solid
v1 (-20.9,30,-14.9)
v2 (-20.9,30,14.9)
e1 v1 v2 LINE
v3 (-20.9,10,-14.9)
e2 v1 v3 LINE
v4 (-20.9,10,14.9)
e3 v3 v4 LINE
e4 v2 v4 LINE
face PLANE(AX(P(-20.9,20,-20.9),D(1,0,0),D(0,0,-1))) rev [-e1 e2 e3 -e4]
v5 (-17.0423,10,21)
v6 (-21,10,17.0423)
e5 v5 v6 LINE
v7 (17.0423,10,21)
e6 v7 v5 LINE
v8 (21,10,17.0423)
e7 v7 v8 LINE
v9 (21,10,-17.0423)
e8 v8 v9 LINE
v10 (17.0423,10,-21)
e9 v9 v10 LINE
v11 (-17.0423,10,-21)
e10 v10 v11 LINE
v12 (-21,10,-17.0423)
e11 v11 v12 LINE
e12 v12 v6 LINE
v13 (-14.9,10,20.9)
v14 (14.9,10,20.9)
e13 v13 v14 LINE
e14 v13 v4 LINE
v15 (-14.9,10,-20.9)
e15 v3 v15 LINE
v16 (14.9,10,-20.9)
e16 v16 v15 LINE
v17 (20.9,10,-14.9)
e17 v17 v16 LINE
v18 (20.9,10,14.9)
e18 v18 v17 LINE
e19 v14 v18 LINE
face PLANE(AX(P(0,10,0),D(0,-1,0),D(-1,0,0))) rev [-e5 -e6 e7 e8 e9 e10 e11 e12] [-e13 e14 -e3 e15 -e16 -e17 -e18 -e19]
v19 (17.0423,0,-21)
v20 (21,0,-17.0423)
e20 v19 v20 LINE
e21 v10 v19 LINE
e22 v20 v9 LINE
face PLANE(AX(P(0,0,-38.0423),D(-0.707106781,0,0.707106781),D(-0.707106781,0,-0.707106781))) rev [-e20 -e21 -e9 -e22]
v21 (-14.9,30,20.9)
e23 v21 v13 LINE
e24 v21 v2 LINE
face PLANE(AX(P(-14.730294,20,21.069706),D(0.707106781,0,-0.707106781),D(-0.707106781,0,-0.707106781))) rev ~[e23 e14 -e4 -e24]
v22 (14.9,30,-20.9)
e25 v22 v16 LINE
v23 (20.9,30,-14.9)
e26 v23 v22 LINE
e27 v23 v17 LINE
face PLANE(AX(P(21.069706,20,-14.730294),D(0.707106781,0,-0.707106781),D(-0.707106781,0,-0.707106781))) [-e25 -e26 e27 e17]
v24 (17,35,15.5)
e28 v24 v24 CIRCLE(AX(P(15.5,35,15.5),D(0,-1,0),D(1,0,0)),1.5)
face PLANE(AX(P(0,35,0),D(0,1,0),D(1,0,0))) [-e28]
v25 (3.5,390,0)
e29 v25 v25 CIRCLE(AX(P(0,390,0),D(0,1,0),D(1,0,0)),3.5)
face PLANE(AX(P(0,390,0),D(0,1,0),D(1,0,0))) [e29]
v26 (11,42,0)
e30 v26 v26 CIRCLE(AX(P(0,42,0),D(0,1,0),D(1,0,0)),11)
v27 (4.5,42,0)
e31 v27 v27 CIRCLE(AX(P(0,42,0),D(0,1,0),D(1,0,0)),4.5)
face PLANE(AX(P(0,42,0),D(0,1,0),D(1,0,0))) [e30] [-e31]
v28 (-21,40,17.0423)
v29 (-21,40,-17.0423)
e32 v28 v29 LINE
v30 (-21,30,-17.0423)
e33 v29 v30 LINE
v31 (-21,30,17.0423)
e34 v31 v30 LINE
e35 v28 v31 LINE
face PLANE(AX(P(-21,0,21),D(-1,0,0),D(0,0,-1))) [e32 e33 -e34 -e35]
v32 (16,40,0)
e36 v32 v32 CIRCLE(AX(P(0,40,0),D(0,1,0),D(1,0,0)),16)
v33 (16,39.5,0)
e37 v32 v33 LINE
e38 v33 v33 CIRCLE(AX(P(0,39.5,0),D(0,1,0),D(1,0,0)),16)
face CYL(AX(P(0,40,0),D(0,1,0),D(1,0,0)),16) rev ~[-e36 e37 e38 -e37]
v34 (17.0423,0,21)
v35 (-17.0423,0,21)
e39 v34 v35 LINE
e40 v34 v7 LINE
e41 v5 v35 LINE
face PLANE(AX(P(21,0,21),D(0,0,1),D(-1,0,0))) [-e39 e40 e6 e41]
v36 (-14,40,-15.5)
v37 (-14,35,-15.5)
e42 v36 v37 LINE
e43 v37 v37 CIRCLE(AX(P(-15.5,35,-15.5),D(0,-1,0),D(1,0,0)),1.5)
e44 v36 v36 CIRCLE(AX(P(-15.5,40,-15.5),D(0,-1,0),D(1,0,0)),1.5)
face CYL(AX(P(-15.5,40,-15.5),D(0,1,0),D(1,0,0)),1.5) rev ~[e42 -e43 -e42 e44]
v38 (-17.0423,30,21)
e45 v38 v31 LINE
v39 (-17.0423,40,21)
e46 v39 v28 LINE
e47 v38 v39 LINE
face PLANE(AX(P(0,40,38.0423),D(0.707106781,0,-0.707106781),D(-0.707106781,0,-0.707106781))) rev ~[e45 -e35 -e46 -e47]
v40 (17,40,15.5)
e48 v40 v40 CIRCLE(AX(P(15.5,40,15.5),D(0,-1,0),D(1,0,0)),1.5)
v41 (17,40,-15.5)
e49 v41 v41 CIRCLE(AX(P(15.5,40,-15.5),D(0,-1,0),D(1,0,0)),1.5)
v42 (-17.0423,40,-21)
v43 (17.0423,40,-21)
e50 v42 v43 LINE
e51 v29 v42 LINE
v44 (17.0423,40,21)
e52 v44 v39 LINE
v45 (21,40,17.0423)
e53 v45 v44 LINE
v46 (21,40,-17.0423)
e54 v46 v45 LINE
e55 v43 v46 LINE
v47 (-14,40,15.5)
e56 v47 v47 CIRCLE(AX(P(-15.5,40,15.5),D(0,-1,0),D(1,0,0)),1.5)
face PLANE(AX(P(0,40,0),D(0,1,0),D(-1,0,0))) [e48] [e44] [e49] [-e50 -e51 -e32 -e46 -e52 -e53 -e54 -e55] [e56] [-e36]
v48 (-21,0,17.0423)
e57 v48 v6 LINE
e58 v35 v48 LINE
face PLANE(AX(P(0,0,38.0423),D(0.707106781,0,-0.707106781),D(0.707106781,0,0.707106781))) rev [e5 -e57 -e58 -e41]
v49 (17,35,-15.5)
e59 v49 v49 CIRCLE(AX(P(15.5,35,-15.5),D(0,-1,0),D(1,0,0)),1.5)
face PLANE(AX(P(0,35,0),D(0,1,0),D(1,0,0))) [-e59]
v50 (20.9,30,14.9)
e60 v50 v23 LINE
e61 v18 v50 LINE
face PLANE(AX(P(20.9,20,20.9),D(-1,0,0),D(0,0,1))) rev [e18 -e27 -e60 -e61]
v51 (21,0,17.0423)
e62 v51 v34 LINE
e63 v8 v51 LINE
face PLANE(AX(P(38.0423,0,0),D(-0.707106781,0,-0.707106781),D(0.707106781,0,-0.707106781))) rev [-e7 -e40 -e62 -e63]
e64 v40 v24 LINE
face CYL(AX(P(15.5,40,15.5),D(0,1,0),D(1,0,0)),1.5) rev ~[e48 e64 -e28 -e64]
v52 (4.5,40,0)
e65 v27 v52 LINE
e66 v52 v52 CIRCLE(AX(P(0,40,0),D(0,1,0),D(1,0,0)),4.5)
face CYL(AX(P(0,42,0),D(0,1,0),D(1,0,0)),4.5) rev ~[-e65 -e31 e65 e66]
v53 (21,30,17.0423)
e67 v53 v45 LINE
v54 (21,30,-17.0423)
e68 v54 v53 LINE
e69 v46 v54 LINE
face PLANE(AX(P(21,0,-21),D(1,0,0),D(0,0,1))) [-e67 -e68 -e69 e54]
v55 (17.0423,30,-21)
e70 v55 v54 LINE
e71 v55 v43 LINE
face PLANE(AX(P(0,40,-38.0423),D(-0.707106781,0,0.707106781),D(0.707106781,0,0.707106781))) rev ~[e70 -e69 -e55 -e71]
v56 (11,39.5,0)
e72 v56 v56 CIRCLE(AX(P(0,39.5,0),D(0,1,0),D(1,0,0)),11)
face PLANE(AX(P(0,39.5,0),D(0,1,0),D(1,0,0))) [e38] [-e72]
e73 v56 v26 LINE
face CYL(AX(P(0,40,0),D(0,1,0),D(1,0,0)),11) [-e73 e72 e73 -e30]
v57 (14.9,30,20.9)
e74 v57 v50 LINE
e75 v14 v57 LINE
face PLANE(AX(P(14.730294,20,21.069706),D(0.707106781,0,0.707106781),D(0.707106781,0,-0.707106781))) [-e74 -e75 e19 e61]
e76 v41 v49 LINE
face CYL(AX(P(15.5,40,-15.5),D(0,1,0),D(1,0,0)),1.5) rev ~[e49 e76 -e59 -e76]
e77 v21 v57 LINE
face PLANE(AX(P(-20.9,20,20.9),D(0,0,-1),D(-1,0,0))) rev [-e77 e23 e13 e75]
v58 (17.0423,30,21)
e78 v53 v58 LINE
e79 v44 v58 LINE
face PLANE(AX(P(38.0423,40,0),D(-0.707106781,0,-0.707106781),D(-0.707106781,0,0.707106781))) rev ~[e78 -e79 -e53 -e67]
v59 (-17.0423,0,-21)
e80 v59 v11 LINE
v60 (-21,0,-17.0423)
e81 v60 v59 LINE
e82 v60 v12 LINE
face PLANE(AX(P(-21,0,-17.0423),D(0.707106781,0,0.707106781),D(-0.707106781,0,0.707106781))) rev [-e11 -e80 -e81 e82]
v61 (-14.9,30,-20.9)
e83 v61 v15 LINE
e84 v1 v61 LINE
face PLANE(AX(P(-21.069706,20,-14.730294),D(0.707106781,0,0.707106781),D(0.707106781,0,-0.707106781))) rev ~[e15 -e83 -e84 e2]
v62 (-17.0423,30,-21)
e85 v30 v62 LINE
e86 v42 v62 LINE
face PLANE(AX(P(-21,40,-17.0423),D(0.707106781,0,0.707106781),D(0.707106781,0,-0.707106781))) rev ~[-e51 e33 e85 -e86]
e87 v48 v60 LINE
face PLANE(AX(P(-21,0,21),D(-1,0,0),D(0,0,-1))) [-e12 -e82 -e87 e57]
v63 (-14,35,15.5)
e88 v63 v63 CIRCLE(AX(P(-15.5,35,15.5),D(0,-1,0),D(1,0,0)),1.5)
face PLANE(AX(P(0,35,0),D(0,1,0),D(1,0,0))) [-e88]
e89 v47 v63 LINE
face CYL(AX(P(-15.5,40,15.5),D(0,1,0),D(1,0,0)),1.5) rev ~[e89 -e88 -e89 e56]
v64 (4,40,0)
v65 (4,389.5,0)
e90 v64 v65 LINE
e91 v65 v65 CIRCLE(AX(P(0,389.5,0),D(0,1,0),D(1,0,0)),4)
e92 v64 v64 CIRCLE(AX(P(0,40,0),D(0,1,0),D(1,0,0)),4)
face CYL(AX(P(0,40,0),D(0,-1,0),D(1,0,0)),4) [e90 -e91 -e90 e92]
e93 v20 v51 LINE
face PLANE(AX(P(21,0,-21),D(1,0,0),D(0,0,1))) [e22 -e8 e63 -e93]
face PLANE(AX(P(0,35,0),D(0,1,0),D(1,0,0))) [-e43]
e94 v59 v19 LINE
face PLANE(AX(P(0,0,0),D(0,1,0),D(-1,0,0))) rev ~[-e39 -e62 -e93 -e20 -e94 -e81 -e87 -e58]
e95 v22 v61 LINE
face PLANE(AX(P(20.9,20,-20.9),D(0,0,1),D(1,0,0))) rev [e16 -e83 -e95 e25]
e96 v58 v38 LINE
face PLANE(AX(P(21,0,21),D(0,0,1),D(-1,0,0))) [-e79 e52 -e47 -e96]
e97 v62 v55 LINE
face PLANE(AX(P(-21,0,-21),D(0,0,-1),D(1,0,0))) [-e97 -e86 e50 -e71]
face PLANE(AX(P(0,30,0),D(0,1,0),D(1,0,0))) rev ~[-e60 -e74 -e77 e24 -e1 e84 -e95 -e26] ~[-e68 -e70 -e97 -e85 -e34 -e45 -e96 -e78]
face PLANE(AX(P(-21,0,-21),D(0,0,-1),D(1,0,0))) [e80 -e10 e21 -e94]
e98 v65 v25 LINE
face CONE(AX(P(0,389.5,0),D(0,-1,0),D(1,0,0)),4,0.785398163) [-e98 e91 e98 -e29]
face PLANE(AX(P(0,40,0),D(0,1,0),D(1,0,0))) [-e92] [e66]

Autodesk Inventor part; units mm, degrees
ref_plane "YZ Plane" through (0, 0, 0) normal (1, 0, 0) x (0, 1, 0)
ref_plane "XZ Plane" through (0, 0, 0) normal (0, 1, 0) x (-1, 0, 0)
sketch "Sketch1" plane through (0, 0, 0) normal (0, 1, 0) x (-1, 0, 0)
  line L0 (-21, 21) -> (21, 21)
  line L1 (21, 21) -> (21, -21)
  line L2 (21, -21) -> (-21, -21)
  line L3 (-21, -21) -> (-21, 21)
  line L4 (-21, 21) -> (21, -21) construction
  line L5 (21, 21) -> (-21, -21) construction
  point P0 (0, 0)
  dimension "d0" = 42
  dimension "d1" = 42
extrude "Extrusion1" add sketch "Sketch1" along normal blind 40
ref_plane "Work Plane1" through (0, 20, 0) normal (0, 1, 0) x (1, 0, 0)
sketch "Sketch2" plane through (0, 40, 0) normal (0, 1, 0) x (1, 0, 0)
  line L0 (0, -38.0423) -> (-38.0423, 0)
  line L1 (-38.0423, 0) -> (0, 38.0423)
  line L2 (0, 38.0423) -> (38.0423, 0)
  line L3 (38.0423, 0) -> (0, -38.0423)
  line L4 (0, -38.0423) -> (0, 38.0423) construction
  line L5 (-38.0423, 0) -> (38.0423, 0) construction
  line L6 (-21, 21) -> (-21, -21) projected
  circle A0 centre (0, 0) radius 250
  dimension "d4" = 53.8
  dimension "d5" = 53.8
  dimension "d6" = 500
extrude "Extrusion2" cut sketch "Sketch2" against normal blind 10
sketch "Sketch3" plane through (0, 20, 0) normal (0, 1, 0) x (1, 0, 0)
  line L0 (-20.9, -20.9) -> (20.9, -20.9)
  line L1 (20.9, -20.9) -> (20.9, 20.9)
  line L2 (20.9, 20.9) -> (-20.9, 20.9)
  line L3 (-20.9, 20.9) -> (-20.9, -20.9)
  line L4 (-21, -21) -> (-21, -17.0423) projected
  line L5 (21, -21) -> (17.0423, -21) projected
  line L6 (21, 21) -> (21, 17.0423) projected
  line L7 (-21, 21) -> (-17.0423, 21) projected
  circle A0 centre (0, 0) radius 200
  dimension "d9" = 0.1
  dimension "d10" = 0.1
  dimension "d11" = 0.1
  dimension "d12" = 0.1
  dimension "d13" = 400
extrude "Extrusion3" cut sketch "Sketch3" along normal up to surface (10 mm away)
chamfer "Chamfer1" distance 6 angle 45 4 edges at (20.9, 25, 20.9) (20.9, 25, -20.9) (-20.9, 25, 20.9) (-20.9, 25, -20.9)
mirror "Mirror1" about plane through (0, 20, 0) normal (0, 1, 0) of "Extrusion3", "Extrusion2", "Chamfer1"
sketch "Sketch4" plane through (0, 40, 0) normal (0, 1, 0) x (1, 0, 0)
  circle A0 centre (0, 0) radius 11
  dimension "d19" = 22
extrude "Extrusion4" add sketch "Sketch4" along normal blind 2
sketch "Sketch5" plane through (0, 40, 0) normal (0, 1, 0) x (1, 0, 0)
  circle A0 centre (0, 0) radius 11 projected
  line L0 (17.0423, -21) -> (21, -17.0423) projected
  line L1 (21, -17.0423) -> (21, 17.0423) projected
  line L2 (21, 17.0423) -> (17.0423, 21) projected
  line L3 (17.0423, 21) -> (-17.0423, 21) projected
  line L4 (-17.0423, 21) -> (-21, 17.0423) projected
  line L5 (-21, 17.0423) -> (-21, -17.0423) projected
  line L6 (-21, -17.0423) -> (-17.0423, -21) projected
  line L7 (-17.0423, -21) -> (17.0423, -21) projected
  circle A1 centre (0, 0) radius 16
  dimension "d22" = 32
extrude "Extrusion5" cut sketch "Sketch5" against normal blind 0.5 contours A1
sketch "Sketch6" plane through (0, 42, 0) normal (0, 1, 0) x (1, 0, 0)
  circle A0 centre (0, 0) radius 4.5
  dimension "d25" = 9
extrude "Extrusion6" cut sketch "Sketch6" against normal blind 2
sketch "Sketch7" plane through (0, 40, 0) normal (0, 1, 0) x (1, 0, 0)
  circle A0 centre (0, 0) radius 4
  dimension "d28" = 8
extrude "Extrusion7" add sketch "Sketch7" along normal blind 350
thread "Thread1" size "TR8x1.5" class "7e" standard "ISO Metric Trapezoidal Threads" full length
chamfer "Chamfer2" distance 0.5 angle 45 1 edges at (-4, 390, 0)
sketch "Sketch8" plane through (0, 40, 0) normal (0, 1, 0) x (1, 0, 0)
  circle A0 centre (0, 0) radius 16 construction
  line L0 (17.0423, -21) -> (21, -17.0423) construction
  line L1 (21, -17.0423) -> (21, 17.0423) construction
  line L2 (21, 17.0423) -> (17.0423, 21) construction
  line L3 (17.0423, 21) -> (-17.0423, 21) construction
  line L4 (-17.0423, 21) -> (-21, 17.0423) construction
  line L5 (-21, 17.0423) -> (-21, -17.0423) construction
  line L6 (-21, -17.0423) -> (-17.0423, -21) construction
  line L7 (-17.0423, -21) -> (17.0423, -21) construction
  line L8 (-15.5, -15.5) -> (15.5, -15.5) construction
  line L9 (15.5, -15.5) -> (15.5, 15.5) construction
  line L10 (15.5, 15.5) -> (-15.5, 15.5) construction
  line L11 (-15.5, 15.5) -> (-15.5, -15.5) construction
  line L12 (-15.5, -15.5) -> (15.5, 15.5) construction
  line L13 (15.5, -15.5) -> (-15.5, 15.5) construction
  circle A1 centre (-15.5, 15.5) radius 1.5
  circle A2 centre (15.5, 15.5) radius 1.5
  circle A3 centre (15.5, -15.5) radius 1.5
  circle A4 centre (-15.5, -15.5) radius 1.5
  dimension "d36" = 31
  dimension "d37" = 31
  dimension "d38" = 3
  dimension "d39" = 3
  dimension "d40" = 3
  dimension "d41" = 3
extrude "Extrusion8" cut sketch "Sketch8" against normal blind 5
thread "Thread2" size "M3x0.5" class "6H" standard "ANSI Metric M Profile" full length
pattern_circular "Circular Pattern1" count 4 over 360 about axis through (0, 40, 0) along (0, 1, 0) of "Extrusion8"
equation "\"d9\" = d10"
equation "\"d11\" = d10"
equation "\"d12\" = d10"
properties part number "linear_stepper_350mm"
